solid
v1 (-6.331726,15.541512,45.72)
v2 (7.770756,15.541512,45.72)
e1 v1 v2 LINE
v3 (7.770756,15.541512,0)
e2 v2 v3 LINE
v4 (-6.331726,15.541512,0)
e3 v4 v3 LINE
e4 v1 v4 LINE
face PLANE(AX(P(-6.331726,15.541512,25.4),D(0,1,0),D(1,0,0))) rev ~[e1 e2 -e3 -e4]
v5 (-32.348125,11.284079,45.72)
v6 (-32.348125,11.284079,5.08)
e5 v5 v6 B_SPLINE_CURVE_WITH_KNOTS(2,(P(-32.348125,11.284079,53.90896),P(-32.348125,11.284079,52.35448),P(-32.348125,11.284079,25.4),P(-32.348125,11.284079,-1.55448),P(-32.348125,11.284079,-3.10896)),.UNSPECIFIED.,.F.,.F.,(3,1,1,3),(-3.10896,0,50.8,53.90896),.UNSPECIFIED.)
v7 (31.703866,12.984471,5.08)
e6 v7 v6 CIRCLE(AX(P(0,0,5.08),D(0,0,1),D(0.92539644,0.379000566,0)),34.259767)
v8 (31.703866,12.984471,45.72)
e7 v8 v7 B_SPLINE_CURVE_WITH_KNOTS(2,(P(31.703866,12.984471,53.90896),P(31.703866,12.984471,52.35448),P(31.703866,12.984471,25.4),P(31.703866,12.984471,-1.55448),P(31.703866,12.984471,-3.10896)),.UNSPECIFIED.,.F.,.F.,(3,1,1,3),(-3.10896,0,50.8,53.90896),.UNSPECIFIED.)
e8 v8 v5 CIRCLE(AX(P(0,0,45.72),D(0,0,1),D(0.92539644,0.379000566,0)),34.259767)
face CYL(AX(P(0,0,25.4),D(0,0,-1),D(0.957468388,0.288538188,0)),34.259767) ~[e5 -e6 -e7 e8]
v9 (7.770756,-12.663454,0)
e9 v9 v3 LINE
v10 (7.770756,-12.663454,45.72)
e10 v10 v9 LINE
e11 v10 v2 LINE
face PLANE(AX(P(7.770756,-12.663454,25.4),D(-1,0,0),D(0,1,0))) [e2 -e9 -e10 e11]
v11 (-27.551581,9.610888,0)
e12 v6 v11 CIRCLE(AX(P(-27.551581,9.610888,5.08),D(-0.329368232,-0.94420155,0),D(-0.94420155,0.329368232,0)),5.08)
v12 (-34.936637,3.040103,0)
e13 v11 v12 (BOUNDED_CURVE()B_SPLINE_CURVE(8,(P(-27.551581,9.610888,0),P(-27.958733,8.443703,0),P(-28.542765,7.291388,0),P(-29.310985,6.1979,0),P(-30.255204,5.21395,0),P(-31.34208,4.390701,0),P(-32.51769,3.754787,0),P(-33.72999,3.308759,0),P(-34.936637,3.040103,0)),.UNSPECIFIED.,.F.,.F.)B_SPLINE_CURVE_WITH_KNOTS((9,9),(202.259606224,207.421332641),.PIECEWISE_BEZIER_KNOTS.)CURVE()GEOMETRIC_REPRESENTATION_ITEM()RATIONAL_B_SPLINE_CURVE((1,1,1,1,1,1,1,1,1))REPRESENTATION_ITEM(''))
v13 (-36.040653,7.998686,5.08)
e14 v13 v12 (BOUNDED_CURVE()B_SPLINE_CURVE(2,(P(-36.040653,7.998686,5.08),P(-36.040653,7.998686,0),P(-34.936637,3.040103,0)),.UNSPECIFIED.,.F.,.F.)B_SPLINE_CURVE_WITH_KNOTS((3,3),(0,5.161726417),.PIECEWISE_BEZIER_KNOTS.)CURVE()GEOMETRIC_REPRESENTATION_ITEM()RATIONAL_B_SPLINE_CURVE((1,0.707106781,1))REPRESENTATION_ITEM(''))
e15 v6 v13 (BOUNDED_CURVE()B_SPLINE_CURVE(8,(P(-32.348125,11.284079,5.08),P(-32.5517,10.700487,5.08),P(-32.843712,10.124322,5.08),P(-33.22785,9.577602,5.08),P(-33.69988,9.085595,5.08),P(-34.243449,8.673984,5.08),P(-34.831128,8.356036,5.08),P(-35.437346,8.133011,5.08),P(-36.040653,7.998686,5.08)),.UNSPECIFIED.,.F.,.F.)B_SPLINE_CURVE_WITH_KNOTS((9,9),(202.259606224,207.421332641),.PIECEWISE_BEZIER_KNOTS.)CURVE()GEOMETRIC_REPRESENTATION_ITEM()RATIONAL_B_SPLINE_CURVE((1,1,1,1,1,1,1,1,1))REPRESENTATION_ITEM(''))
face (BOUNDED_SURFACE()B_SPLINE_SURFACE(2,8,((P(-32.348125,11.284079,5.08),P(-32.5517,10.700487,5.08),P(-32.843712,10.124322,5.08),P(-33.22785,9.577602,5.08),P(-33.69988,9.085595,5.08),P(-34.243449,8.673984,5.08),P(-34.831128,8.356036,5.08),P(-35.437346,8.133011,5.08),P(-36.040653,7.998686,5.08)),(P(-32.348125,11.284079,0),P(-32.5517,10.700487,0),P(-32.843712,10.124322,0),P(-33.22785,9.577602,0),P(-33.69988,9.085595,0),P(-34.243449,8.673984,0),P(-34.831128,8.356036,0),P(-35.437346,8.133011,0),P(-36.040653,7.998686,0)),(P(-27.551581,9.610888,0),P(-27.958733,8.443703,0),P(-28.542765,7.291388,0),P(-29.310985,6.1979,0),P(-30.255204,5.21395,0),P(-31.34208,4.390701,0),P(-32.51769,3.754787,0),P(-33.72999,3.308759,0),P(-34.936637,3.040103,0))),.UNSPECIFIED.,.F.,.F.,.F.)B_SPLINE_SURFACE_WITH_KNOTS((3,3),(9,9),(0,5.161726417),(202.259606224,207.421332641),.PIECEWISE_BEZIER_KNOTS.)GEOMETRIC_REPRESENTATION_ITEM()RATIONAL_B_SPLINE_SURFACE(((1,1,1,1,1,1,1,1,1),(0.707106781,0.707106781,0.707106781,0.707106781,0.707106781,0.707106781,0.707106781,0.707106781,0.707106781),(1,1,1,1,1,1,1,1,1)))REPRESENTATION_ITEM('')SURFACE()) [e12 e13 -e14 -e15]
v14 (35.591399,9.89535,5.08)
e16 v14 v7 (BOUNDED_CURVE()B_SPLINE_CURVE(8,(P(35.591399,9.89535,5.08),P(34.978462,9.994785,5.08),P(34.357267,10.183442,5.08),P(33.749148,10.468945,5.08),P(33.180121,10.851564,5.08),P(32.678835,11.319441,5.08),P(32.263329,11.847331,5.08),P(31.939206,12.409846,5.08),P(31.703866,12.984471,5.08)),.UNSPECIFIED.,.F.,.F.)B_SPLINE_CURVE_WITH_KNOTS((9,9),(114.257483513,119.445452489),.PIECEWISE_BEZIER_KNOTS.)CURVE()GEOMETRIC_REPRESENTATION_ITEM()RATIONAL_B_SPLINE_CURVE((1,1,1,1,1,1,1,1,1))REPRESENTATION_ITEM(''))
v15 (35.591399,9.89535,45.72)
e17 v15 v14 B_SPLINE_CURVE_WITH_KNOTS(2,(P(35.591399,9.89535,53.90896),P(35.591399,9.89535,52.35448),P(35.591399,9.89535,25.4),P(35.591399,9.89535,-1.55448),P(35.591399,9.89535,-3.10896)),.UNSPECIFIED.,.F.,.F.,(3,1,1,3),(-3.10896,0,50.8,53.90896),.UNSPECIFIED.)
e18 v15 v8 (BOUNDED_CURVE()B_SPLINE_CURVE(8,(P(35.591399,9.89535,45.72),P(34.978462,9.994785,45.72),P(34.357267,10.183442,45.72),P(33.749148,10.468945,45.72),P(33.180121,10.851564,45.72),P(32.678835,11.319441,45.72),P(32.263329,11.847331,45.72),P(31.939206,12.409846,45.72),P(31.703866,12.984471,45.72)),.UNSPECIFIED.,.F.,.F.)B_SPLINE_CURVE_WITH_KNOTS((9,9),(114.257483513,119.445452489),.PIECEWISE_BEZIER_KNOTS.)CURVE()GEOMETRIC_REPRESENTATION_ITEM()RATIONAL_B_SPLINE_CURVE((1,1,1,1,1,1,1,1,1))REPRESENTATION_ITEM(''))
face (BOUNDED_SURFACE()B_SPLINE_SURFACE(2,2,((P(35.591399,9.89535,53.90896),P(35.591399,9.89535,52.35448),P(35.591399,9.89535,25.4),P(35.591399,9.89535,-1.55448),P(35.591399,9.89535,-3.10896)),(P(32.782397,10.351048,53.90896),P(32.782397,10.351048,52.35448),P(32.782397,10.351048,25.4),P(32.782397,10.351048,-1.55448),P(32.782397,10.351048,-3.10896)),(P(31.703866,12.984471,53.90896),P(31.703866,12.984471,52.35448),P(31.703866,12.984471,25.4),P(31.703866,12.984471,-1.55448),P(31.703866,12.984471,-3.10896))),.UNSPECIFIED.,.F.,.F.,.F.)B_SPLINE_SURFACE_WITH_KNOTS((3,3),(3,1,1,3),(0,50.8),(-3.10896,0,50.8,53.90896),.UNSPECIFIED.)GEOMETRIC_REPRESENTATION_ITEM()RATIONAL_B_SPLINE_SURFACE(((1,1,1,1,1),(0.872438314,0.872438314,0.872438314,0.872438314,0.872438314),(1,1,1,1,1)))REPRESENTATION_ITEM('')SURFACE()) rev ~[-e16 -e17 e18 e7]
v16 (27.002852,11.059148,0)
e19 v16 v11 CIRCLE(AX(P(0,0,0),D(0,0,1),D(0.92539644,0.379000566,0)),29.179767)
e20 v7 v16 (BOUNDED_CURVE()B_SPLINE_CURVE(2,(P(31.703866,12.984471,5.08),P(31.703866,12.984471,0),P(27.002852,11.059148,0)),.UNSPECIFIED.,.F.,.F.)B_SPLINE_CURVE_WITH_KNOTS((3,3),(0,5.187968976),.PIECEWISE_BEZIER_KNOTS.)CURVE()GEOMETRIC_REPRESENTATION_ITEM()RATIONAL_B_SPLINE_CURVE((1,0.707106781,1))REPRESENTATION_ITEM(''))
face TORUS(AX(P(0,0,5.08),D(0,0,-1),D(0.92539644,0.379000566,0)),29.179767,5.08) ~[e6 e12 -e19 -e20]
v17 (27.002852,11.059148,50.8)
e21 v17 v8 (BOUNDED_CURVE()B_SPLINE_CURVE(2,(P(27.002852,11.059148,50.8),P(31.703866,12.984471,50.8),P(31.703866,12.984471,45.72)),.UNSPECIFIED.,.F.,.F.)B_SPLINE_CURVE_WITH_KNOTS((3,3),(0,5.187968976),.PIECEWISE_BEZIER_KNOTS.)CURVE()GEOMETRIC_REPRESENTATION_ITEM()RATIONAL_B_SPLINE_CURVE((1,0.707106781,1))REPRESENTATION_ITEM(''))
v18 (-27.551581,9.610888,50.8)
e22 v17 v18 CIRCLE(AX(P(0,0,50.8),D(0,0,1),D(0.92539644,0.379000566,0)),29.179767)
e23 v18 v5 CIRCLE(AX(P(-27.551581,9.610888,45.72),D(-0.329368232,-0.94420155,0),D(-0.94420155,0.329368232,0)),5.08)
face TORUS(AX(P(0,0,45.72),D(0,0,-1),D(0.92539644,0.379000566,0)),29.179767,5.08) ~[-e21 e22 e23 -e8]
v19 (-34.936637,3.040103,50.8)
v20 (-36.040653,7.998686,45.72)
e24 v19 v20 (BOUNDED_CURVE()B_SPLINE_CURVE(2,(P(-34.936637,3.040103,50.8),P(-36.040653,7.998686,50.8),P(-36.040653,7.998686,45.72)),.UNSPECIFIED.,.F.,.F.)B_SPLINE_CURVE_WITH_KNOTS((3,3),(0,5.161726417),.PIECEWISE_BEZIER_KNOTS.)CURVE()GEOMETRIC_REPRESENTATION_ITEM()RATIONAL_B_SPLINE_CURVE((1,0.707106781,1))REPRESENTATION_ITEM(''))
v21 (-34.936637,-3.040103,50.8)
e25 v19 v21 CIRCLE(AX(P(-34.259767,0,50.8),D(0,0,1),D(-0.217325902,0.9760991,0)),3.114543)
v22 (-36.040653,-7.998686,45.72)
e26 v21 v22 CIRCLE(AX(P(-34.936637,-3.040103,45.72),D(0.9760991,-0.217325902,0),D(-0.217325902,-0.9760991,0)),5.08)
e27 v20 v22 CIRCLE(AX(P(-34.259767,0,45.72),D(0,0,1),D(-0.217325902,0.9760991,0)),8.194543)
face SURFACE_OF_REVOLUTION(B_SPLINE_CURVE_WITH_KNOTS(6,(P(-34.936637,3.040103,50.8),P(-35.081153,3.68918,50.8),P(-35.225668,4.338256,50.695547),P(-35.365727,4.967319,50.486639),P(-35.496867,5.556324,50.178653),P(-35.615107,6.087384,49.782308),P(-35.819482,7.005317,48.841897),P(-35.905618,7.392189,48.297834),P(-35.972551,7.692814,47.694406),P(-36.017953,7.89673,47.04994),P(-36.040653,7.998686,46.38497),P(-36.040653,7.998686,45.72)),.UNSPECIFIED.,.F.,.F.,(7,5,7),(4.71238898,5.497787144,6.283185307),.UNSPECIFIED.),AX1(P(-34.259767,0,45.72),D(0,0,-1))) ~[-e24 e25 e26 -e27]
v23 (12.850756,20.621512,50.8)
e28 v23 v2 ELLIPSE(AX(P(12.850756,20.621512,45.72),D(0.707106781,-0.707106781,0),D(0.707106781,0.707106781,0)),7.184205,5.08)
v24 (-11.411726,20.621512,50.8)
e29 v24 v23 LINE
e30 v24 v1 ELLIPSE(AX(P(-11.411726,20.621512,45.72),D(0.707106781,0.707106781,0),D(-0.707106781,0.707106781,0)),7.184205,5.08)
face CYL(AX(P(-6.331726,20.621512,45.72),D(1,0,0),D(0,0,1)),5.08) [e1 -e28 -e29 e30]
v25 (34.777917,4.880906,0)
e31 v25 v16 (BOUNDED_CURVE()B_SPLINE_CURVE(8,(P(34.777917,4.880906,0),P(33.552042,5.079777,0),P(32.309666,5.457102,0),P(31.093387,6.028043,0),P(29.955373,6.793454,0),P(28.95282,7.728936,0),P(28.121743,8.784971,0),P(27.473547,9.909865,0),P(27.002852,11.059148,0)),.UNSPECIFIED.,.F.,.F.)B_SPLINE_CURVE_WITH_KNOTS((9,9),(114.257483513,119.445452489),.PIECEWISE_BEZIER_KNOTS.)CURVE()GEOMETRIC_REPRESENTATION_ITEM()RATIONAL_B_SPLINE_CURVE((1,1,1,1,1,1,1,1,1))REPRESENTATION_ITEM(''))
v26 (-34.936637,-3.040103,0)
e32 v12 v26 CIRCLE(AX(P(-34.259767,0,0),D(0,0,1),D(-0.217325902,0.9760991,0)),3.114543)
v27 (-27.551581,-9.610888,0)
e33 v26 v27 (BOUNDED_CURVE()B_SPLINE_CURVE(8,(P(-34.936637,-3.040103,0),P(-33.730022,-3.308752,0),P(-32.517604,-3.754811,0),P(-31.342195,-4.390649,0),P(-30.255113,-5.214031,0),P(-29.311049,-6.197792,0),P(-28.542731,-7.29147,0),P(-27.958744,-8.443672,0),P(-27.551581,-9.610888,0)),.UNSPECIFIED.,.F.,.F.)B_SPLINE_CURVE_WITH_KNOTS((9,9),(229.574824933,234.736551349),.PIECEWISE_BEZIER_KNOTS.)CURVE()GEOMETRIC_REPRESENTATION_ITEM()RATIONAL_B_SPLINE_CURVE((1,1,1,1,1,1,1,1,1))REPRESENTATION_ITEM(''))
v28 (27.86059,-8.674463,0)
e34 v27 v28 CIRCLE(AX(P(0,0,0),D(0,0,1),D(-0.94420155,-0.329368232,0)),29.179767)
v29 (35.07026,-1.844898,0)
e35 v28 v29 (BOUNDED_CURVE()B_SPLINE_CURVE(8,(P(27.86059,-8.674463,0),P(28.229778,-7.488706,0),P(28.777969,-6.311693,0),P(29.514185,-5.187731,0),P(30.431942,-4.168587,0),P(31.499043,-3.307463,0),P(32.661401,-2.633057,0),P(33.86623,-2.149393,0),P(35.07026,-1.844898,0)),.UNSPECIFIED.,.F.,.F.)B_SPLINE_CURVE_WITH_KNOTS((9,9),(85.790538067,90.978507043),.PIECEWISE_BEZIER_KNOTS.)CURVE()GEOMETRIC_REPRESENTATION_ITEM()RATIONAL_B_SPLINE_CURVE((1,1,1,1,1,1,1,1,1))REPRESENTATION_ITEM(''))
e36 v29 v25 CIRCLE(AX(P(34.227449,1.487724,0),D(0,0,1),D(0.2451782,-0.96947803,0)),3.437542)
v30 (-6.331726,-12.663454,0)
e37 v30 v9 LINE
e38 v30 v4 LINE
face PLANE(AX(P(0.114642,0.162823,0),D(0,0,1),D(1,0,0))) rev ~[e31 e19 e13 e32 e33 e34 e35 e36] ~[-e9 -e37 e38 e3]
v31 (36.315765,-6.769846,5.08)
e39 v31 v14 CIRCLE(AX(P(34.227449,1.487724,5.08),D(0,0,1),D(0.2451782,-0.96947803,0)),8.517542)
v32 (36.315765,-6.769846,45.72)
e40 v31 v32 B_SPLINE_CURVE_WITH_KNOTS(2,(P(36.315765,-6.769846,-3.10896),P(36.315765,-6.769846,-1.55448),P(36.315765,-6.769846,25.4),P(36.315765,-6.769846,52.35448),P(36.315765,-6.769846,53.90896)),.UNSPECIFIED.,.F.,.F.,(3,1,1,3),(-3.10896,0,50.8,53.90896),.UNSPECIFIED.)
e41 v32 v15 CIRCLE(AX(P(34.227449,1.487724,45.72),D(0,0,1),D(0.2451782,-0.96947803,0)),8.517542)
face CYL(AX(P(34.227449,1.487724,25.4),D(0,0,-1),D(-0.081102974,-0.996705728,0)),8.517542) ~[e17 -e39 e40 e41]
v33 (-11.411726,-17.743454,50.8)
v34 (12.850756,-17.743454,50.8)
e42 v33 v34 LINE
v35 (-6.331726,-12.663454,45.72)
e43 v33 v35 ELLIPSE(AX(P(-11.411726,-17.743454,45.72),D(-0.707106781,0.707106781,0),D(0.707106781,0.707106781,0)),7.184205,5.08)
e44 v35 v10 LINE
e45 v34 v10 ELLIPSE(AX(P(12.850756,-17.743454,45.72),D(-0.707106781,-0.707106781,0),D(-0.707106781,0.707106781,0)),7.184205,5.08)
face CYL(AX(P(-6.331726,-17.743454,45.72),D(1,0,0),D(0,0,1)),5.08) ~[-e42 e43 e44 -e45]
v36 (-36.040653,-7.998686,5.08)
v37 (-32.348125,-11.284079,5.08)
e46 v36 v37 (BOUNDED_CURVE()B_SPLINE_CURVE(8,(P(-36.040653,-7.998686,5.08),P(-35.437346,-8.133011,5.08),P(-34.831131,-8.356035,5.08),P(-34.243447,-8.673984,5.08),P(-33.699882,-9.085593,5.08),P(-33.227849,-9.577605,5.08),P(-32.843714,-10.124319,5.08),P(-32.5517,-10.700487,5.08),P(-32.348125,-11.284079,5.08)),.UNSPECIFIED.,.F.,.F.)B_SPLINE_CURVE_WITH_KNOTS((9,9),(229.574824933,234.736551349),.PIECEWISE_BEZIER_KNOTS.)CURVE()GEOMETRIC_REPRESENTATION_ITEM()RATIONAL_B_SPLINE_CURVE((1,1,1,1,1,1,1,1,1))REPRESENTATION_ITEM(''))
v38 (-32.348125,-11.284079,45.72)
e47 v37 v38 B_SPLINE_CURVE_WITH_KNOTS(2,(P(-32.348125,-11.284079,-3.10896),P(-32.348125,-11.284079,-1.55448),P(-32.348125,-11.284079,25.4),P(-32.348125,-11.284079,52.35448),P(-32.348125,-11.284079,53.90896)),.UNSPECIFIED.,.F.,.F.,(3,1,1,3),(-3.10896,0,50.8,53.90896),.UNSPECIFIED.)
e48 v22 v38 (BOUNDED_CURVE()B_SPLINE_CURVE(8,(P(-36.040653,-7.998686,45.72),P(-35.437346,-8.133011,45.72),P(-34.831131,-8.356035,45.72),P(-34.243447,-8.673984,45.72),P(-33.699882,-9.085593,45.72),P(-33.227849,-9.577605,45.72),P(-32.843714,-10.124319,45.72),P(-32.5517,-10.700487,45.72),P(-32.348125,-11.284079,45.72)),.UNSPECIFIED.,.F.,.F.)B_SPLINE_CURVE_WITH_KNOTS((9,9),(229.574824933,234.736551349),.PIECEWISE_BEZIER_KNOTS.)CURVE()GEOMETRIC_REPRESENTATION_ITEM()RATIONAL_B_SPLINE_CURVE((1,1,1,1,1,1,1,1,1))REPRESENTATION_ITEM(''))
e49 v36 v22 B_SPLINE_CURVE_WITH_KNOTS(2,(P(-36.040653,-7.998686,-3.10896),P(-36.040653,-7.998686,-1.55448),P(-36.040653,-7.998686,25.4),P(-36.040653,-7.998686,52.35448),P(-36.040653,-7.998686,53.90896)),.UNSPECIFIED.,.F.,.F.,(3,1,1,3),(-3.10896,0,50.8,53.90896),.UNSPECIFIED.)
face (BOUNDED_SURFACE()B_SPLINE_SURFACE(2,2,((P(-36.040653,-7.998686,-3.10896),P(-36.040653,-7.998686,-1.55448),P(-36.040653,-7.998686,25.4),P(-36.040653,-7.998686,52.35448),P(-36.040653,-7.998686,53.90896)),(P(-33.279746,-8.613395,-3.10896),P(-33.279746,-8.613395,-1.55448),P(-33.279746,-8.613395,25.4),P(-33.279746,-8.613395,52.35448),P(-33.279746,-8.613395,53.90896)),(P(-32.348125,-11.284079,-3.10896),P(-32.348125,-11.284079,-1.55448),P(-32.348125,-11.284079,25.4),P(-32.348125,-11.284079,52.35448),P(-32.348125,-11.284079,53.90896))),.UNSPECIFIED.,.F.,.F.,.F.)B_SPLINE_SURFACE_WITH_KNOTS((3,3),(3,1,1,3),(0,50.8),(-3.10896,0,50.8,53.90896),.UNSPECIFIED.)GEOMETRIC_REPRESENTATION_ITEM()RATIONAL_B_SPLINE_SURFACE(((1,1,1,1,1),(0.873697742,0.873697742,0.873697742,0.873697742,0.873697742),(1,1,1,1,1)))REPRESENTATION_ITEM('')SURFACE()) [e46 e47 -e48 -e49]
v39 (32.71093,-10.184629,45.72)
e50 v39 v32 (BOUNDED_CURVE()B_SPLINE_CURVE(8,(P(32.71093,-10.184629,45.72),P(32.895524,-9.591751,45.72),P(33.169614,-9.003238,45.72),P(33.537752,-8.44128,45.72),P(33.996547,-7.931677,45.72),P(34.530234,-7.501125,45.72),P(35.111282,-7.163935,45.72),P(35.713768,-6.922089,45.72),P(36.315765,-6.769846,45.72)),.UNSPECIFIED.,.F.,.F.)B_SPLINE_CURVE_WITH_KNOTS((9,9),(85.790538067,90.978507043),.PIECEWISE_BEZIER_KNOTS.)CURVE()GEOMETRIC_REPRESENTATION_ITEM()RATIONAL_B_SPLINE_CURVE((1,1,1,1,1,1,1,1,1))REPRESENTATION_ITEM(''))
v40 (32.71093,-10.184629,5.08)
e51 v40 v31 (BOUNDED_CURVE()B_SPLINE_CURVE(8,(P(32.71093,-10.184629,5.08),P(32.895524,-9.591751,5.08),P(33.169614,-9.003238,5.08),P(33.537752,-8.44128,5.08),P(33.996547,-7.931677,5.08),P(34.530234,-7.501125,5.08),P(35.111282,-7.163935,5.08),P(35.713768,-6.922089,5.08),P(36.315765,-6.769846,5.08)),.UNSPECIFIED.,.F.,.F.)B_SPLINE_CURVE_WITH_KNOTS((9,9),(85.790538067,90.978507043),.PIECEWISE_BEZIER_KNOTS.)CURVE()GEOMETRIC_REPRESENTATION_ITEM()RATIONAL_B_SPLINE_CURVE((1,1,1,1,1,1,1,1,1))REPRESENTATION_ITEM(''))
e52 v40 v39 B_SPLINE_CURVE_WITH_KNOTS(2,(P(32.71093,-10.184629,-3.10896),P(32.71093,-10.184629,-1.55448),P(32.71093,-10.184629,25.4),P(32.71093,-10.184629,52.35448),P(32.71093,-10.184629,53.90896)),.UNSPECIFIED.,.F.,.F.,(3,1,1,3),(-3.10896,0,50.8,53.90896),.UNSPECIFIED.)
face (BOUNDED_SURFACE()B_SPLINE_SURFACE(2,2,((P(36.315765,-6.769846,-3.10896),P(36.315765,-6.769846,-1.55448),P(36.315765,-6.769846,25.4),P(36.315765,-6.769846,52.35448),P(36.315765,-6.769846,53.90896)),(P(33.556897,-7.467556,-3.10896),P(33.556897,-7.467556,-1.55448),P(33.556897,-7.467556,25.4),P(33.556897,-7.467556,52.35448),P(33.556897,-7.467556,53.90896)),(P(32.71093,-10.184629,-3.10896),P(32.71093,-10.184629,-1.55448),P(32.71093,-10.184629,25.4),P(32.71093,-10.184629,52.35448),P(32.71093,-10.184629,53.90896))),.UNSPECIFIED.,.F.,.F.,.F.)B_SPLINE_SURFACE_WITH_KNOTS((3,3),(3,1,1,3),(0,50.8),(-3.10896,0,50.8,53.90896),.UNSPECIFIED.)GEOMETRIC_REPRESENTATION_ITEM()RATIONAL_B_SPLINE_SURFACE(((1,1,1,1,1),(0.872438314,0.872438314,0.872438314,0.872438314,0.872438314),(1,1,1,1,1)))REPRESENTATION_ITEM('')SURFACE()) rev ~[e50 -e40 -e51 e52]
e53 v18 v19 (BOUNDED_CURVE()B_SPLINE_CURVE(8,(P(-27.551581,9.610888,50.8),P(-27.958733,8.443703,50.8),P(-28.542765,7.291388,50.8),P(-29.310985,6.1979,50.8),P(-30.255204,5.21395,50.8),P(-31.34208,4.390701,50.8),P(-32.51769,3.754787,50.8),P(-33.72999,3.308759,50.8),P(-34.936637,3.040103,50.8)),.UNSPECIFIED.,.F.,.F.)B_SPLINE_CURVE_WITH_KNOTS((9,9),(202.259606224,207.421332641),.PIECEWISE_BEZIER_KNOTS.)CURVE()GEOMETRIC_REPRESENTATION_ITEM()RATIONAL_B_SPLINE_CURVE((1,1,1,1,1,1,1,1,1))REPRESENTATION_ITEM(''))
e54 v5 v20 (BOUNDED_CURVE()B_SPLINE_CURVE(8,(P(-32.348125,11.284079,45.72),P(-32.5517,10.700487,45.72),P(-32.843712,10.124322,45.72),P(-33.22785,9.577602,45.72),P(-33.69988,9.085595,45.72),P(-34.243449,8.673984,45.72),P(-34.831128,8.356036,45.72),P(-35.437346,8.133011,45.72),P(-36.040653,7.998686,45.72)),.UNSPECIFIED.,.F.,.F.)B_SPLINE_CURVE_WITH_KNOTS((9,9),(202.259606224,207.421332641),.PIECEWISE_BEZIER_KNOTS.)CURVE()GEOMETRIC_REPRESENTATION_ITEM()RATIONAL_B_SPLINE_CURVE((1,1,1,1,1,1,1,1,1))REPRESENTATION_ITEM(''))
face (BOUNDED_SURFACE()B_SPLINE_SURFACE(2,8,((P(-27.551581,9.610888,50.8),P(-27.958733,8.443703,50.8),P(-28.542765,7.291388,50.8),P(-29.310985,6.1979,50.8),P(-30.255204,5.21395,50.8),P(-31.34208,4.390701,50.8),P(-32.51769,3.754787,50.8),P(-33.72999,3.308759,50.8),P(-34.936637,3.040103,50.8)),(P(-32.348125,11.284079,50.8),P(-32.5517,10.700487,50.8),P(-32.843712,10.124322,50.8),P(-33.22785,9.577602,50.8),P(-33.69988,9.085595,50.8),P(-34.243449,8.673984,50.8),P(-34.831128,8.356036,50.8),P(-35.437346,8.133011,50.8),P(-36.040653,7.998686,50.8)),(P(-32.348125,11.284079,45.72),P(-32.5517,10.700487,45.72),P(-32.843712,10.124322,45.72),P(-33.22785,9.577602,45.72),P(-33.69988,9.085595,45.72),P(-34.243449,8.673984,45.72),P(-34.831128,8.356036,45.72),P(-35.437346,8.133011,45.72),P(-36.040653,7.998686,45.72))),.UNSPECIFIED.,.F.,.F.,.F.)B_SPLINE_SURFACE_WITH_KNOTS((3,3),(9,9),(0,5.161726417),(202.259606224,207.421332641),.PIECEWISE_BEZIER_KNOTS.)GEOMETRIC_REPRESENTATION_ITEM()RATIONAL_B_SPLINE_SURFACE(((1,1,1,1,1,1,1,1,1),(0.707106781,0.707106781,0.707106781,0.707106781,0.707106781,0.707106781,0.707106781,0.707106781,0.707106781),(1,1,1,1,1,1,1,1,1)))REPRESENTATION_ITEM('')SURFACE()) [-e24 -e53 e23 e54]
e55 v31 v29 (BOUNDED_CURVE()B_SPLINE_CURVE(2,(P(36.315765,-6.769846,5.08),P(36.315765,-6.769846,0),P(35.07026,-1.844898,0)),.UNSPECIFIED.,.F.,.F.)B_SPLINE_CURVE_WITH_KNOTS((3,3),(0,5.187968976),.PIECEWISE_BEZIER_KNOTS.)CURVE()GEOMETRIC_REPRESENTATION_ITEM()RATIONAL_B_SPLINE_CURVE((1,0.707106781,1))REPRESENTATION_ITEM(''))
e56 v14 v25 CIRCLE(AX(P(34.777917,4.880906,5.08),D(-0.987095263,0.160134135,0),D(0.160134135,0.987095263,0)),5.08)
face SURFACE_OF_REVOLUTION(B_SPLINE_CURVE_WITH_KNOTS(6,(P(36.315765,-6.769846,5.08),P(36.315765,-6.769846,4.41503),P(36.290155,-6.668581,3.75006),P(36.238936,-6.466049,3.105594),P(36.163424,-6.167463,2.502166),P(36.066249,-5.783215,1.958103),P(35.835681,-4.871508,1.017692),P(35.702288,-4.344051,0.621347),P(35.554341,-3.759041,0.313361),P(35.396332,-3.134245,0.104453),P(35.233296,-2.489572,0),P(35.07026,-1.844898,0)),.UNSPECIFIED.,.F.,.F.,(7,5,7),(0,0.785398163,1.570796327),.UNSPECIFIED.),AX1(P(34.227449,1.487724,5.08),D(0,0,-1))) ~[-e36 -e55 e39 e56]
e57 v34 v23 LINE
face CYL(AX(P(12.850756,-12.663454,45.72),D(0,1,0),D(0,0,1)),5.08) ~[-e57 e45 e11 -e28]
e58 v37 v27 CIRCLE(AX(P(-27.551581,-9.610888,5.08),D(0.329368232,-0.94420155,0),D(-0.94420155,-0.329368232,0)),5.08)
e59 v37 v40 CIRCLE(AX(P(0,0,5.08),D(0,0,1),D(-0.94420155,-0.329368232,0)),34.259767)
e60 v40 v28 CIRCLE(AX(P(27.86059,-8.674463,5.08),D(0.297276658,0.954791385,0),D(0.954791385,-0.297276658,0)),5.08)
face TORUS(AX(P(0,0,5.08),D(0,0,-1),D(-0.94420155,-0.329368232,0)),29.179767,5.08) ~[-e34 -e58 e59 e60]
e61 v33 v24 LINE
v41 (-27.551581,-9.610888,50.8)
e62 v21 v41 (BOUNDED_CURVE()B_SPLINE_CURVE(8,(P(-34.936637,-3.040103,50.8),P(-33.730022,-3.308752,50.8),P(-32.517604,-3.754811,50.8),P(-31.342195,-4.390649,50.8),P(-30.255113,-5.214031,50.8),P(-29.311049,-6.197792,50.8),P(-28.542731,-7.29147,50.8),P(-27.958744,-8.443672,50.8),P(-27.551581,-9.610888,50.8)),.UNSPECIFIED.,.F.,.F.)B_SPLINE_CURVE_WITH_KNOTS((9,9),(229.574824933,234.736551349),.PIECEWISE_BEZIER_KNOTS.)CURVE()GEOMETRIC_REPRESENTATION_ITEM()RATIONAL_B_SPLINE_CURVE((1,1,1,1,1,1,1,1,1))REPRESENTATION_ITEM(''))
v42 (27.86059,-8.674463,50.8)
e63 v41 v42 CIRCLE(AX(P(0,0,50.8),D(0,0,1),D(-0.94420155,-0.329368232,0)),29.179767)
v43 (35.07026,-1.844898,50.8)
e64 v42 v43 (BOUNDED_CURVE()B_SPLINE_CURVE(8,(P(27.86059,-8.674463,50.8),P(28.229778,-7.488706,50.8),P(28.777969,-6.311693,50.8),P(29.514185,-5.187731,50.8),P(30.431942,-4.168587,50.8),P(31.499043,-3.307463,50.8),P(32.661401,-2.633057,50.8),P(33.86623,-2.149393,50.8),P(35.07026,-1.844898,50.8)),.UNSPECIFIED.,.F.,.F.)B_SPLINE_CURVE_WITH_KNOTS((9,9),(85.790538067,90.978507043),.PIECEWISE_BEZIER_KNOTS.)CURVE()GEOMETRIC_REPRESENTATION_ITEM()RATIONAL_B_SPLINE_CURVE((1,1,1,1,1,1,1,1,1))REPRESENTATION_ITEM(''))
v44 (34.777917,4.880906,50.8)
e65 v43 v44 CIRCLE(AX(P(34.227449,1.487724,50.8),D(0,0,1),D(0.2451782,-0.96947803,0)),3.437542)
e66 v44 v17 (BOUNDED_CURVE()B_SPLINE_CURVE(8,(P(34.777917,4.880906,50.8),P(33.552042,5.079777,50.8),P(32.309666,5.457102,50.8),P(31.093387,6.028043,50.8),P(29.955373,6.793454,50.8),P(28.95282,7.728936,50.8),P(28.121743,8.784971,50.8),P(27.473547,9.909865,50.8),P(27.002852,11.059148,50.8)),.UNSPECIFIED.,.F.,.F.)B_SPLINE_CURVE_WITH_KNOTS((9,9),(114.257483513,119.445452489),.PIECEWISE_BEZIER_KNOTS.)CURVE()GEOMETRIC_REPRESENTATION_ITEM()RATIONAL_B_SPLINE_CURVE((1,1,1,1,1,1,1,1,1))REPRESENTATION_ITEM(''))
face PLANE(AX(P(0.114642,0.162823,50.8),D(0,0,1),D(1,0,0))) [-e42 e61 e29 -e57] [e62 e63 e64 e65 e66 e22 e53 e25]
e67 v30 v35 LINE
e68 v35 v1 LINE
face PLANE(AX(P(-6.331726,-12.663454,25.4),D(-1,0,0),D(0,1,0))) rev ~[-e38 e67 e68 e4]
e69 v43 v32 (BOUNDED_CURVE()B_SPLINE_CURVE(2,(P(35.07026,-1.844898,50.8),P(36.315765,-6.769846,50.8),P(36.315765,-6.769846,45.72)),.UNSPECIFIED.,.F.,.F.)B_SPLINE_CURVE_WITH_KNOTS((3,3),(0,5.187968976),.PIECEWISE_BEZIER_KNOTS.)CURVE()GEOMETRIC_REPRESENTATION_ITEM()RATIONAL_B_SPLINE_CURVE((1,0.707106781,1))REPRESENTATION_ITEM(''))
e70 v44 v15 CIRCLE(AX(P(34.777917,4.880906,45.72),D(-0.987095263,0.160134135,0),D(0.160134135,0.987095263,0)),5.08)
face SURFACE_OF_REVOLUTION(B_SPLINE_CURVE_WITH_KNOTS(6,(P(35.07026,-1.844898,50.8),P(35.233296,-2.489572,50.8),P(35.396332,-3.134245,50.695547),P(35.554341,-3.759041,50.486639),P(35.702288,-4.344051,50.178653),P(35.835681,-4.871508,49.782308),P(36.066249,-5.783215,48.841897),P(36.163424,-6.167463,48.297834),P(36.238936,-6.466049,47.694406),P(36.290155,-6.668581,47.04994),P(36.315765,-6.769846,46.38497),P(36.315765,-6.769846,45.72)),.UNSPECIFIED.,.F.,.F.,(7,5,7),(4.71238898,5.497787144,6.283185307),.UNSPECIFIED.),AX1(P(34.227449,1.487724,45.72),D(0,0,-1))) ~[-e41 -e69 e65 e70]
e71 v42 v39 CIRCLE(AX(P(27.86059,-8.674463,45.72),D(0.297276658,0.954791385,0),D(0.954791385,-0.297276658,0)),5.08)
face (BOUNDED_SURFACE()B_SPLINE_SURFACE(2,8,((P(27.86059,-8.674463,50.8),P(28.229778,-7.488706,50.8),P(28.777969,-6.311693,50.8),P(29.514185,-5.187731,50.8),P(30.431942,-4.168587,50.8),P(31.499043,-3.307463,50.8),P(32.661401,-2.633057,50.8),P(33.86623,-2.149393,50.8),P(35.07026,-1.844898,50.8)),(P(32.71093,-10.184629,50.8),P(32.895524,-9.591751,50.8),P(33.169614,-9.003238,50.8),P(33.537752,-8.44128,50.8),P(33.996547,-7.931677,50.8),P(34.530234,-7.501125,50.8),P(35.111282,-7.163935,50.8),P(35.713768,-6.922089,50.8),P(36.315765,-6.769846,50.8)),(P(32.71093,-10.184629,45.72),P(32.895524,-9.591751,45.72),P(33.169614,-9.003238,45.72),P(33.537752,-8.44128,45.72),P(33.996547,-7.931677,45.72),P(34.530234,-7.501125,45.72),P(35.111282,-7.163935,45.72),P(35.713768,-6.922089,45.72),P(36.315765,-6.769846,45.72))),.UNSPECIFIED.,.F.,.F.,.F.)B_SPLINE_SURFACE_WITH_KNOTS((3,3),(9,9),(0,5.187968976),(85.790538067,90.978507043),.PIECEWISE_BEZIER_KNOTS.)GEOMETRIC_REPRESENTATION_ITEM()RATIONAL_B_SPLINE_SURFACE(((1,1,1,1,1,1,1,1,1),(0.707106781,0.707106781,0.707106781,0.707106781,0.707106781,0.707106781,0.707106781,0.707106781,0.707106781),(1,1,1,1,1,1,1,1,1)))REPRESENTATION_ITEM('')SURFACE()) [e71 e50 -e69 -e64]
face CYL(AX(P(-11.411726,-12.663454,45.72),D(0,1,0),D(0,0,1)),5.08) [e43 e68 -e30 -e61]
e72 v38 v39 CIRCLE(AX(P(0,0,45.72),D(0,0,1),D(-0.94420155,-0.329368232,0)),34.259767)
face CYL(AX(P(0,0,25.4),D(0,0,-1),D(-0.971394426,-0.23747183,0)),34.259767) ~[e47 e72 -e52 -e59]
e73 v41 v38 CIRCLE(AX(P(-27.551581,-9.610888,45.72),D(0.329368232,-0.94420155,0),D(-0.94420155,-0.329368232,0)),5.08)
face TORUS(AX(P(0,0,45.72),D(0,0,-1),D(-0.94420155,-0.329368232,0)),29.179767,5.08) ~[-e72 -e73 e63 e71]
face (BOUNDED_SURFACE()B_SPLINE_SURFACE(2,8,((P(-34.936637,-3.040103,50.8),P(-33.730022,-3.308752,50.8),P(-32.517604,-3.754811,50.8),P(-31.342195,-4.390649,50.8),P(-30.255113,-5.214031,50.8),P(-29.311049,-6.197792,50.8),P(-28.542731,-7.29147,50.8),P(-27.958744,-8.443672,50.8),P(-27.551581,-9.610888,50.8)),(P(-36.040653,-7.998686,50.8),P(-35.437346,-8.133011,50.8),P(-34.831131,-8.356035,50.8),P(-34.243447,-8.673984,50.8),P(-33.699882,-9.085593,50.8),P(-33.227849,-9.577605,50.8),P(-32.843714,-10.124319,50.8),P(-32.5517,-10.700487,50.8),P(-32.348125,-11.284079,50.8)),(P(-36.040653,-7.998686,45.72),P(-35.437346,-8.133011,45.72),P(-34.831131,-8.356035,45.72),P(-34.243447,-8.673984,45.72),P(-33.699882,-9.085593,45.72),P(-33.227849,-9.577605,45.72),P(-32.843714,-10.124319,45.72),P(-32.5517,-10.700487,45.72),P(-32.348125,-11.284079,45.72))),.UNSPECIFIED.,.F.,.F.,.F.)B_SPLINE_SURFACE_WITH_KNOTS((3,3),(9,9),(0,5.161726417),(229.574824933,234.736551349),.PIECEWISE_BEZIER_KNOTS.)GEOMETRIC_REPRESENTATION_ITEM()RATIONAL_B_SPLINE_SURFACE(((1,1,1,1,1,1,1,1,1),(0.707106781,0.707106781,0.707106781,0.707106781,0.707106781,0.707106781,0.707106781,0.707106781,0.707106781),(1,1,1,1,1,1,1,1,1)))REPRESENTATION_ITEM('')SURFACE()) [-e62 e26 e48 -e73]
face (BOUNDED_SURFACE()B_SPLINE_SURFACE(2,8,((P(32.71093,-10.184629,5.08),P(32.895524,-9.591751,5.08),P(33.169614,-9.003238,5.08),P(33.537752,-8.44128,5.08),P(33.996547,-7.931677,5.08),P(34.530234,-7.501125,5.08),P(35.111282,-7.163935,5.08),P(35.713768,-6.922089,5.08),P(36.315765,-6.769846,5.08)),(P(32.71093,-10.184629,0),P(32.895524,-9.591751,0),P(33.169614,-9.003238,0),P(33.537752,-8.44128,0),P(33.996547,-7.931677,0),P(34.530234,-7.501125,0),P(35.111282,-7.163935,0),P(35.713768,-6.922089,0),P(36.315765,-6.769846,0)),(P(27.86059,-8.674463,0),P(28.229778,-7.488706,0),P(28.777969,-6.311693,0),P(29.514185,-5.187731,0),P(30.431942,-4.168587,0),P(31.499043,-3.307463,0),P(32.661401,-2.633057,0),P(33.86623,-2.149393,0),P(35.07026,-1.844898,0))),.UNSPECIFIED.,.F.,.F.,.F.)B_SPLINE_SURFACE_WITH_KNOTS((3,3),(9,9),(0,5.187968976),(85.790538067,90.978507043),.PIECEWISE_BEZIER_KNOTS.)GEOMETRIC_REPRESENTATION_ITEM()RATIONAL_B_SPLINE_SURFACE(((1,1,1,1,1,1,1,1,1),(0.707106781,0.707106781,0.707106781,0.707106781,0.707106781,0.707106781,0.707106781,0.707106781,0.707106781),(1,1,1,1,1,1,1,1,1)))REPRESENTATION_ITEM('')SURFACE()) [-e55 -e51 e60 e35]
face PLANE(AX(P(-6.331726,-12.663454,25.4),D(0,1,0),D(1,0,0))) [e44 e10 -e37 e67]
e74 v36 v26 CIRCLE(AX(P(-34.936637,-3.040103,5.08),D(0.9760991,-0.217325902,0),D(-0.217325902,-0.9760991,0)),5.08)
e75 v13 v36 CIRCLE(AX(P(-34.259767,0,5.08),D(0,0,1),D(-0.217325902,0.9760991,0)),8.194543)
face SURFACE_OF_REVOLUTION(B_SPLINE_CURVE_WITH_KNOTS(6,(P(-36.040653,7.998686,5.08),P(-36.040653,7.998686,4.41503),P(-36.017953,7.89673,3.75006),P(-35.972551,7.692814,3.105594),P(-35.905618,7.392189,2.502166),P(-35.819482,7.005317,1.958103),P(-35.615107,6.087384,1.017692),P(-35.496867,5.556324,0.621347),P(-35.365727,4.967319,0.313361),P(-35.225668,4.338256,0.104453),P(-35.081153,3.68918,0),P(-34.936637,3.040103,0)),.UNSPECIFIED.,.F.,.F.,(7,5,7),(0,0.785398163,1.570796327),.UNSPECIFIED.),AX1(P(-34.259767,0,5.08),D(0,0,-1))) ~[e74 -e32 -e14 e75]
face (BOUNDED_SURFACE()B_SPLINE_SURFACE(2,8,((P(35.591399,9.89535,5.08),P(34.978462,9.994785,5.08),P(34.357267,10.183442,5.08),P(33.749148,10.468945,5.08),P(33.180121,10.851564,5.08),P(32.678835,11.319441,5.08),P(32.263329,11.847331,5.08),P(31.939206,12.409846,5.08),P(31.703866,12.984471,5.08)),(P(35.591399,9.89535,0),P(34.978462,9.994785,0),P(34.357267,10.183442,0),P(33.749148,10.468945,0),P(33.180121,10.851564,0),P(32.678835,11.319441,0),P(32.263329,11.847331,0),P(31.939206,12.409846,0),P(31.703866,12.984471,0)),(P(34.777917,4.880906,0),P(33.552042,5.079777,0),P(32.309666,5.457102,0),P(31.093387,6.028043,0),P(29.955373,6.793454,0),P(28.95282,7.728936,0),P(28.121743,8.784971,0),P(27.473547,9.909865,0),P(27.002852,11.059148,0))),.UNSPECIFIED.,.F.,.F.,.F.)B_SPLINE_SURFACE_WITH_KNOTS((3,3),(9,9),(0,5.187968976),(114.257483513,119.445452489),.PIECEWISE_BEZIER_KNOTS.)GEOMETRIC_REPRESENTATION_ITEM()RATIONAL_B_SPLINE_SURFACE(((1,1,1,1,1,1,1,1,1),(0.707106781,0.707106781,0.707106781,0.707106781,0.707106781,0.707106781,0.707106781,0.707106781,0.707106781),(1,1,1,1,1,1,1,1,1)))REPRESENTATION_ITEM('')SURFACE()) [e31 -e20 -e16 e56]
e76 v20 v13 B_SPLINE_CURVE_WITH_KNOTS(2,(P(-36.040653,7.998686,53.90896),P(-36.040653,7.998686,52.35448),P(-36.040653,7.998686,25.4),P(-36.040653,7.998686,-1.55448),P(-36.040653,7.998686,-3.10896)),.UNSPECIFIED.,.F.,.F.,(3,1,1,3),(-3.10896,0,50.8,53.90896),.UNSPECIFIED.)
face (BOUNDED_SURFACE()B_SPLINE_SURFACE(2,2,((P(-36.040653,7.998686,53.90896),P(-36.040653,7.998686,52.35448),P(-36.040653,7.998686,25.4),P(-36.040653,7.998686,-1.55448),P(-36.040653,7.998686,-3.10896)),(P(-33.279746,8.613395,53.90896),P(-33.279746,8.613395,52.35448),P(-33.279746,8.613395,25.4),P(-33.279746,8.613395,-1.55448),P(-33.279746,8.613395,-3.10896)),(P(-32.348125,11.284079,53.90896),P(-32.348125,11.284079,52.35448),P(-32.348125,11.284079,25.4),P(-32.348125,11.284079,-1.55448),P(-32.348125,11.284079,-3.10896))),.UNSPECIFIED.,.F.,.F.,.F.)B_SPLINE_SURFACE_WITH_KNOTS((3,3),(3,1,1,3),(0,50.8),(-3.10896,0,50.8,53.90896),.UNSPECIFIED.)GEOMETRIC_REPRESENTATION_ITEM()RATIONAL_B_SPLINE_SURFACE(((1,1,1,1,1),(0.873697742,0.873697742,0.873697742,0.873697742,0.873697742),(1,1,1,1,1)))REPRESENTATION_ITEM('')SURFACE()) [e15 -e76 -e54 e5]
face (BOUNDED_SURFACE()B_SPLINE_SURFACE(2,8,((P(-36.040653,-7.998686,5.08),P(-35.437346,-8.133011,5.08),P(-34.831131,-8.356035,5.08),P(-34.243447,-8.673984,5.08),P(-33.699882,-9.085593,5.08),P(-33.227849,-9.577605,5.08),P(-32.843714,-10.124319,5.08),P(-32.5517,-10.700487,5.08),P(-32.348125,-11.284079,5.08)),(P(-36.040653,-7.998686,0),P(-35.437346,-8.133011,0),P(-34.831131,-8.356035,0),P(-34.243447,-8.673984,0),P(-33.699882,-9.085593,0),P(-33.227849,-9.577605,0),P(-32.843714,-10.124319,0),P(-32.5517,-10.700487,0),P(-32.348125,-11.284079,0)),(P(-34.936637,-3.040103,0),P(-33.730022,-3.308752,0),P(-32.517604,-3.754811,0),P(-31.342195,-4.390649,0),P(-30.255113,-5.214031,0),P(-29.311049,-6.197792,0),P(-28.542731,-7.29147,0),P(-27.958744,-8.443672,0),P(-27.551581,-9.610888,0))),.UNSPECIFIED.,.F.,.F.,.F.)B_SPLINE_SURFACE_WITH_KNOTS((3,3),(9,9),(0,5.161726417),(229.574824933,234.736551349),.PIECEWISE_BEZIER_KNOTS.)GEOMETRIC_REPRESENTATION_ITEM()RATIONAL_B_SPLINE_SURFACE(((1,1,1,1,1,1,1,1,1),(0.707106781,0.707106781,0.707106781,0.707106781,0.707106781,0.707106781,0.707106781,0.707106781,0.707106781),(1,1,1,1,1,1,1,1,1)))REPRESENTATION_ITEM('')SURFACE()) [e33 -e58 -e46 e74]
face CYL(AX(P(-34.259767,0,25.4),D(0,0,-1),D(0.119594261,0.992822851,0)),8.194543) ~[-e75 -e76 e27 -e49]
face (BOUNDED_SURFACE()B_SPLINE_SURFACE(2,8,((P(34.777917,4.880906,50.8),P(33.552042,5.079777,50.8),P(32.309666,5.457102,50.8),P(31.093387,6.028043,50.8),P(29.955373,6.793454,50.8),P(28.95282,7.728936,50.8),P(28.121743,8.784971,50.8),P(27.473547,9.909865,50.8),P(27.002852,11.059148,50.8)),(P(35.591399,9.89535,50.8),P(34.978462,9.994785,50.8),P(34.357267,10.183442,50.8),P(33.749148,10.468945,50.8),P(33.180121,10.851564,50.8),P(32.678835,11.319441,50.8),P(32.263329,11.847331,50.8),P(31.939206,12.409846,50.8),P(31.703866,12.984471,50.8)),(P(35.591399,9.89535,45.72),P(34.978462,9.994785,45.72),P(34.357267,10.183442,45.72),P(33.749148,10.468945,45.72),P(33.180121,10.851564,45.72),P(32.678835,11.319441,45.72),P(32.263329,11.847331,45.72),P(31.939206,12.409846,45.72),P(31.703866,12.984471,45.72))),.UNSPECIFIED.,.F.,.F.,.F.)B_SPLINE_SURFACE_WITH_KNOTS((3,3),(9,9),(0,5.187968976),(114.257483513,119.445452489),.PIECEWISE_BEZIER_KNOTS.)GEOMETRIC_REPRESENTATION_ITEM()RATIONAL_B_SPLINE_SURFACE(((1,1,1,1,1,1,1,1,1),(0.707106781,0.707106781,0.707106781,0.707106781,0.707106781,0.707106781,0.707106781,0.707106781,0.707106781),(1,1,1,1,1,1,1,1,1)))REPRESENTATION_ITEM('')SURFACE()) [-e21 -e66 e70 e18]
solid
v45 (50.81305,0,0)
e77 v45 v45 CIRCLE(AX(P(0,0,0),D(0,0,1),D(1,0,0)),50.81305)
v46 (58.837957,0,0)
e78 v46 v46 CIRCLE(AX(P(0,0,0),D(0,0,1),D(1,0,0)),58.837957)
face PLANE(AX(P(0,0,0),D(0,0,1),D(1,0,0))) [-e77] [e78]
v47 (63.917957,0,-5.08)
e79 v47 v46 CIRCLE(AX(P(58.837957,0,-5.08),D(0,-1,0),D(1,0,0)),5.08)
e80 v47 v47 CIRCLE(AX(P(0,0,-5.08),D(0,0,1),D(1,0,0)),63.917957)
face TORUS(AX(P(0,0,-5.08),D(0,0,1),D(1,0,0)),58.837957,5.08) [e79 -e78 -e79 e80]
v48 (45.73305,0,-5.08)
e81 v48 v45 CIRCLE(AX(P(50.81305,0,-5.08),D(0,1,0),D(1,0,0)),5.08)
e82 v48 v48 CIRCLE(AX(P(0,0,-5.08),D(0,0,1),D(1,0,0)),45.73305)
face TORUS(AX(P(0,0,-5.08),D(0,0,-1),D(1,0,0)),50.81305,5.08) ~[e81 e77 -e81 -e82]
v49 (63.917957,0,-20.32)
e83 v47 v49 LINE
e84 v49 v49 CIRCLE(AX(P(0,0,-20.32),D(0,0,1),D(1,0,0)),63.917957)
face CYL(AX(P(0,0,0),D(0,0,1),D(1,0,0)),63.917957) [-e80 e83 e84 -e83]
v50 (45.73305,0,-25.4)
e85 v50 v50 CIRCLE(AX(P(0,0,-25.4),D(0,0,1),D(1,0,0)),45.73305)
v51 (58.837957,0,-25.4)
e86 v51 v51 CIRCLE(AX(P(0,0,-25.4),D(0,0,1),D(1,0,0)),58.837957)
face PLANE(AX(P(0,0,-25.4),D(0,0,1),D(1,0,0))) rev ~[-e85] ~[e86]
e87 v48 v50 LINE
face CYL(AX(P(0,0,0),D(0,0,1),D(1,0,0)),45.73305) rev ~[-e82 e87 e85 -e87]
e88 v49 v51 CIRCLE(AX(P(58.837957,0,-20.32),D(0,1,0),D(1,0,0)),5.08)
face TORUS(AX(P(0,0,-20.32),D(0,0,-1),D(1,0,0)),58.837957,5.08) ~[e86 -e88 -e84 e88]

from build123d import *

# Parameters (mm, degrees)
F0_R     = 63.9179565319
F0_R_2   = 45.7330498598
F1_DEPTH = 25.4
F0_W     = 14.1024817713
F0_H     = 28.2049654052
F2_DEPTH = 25.4
F3_DEPTH = 25.4
F4_F1_R  = 5.08
F4_F2_R  = 5.08
F4_F3_R  = 5.08
F5_R     = 5.08


# Not quite as in the source:
# - a feature of the source that left no trace in its solid (it failed there, or was rolled back) is left out


with BuildPart() as f1:
    # F0 (on Top) → F1 (new body)
    with BuildSketch(Plane.XY):
        Circle(F0_R)
        Circle(F0_R_2, mode=Mode.SUBTRACT)
    extrude(amount=-F1_DEPTH)

    # F5
    f5_edges = [f1.edges().sort_by_distance(p)[0] for p in [
        (63.917957, 0, -12.7),
        (-63.917957, 0, 0),
        (-63.917957, 0, -25.4),
        (-45.73305, 0, 0),
    ]]
    fillet(f5_edges, radius=F5_R)


with BuildPart() as f2:
    # F0 (on Top) → F2 (new body)
    with BuildSketch(Plane.XY):
        with BuildLine():
            ThreePointArc((-33.2797462544, 8.1357294422), (-42.4543094539, 0), (-33.2797462544, -8.1357294422))
            ThreePointArc((-33.2797462544, -8.1357294422), (0.5813538288, -34.2548337033), (33.5366512199, -7.0017590123))
            ThreePointArc((33.5366512199, -7.0017590123), (42.7369569293, 1.8575969402), (32.8026434596, 9.8852509515))
            ThreePointArc((32.8026434596, 9.8852509515), (-0.9067045534, 34.2477662216), (-33.2797462544, 8.1357294422))
        make_face()
        with Locations((0.7195149083, 1.4390288852)):
            Rectangle(F0_W, F0_H, mode=Mode.SUBTRACT)
    extrude(amount=F2_DEPTH)

    # F3 (add): a face of the model
    f3_faces = [f2.faces().sort_by_distance(p)[0] for p in [
        (0.5628010063, -33.1616546129, 25.4),
    ]]
    extrude(f3_faces, amount=F3_DEPTH)

    # F4: fillet of radius 5.08 on 15 edges, made by hand

    # F4_f1
    f4_f1_edges = [f2.edges().sort_by_distance(p)[0] for p in [
        (-33.2797462544, -8.1357294422, 25.4),
        (33.5366512199, -7.0017590123, 25.4),
        (32.8026434596, 9.8852509515, 25.4),
        (-33.2797462544, 8.1357294422, 25.4),
    ]]
    fillet(f4_f1_edges, radius=F4_F1_R)

    # F4_f2
    f4_f2_edges = [f2.edges().sort_by_distance(p)[0] for p in [
        (-6.3317259774, 1.4390288852, 50.8),
        (0.7195149083, 15.5415115878, 50.8),
        (7.7707557939, 1.4390288852, 50.8),
        (0.7195149083, -12.6634538174, 50.8),
    ]]
    fillet(f4_f2_edges, radius=F4_F2_R)

    # F4_f3
    f4_f3_edges = [f2.edges().sort_by_distance(p)[0] for p in [
        (0.5788820282, -34.2548755641, 50.8),
        (0.5788820282, -34.2548755641, 0),
        (42.7369569293, 1.8575969402, 50.8),
        (42.7369569293, 1.8575969402, 0),
        (-0.9091758401, 34.2477007054, 50.8),
        (-42.4543094539, 0, 50.8),
        (-42.4543094539, 0, 0),
        (-33.7678946689, 9.162035776, 0),
        (-33.7678946689, -9.162035776, 0),
        (-33.7678946689, 9.162035776, 50.8),
        (-33.7678946689, -9.162035776, 50.8),
        (33.2444872281, 10.932568882, 50.8),
        (34.0677019889, -8.0067892826, 0),
        (33.2444872281, 10.932568882, 0),
        (34.0677019889, -8.0067892826, 50.8),
    ]]
    fillet(f4_f3_edges, radius=F4_F3_R)


solid = Compound([f1.part, f2.part])
